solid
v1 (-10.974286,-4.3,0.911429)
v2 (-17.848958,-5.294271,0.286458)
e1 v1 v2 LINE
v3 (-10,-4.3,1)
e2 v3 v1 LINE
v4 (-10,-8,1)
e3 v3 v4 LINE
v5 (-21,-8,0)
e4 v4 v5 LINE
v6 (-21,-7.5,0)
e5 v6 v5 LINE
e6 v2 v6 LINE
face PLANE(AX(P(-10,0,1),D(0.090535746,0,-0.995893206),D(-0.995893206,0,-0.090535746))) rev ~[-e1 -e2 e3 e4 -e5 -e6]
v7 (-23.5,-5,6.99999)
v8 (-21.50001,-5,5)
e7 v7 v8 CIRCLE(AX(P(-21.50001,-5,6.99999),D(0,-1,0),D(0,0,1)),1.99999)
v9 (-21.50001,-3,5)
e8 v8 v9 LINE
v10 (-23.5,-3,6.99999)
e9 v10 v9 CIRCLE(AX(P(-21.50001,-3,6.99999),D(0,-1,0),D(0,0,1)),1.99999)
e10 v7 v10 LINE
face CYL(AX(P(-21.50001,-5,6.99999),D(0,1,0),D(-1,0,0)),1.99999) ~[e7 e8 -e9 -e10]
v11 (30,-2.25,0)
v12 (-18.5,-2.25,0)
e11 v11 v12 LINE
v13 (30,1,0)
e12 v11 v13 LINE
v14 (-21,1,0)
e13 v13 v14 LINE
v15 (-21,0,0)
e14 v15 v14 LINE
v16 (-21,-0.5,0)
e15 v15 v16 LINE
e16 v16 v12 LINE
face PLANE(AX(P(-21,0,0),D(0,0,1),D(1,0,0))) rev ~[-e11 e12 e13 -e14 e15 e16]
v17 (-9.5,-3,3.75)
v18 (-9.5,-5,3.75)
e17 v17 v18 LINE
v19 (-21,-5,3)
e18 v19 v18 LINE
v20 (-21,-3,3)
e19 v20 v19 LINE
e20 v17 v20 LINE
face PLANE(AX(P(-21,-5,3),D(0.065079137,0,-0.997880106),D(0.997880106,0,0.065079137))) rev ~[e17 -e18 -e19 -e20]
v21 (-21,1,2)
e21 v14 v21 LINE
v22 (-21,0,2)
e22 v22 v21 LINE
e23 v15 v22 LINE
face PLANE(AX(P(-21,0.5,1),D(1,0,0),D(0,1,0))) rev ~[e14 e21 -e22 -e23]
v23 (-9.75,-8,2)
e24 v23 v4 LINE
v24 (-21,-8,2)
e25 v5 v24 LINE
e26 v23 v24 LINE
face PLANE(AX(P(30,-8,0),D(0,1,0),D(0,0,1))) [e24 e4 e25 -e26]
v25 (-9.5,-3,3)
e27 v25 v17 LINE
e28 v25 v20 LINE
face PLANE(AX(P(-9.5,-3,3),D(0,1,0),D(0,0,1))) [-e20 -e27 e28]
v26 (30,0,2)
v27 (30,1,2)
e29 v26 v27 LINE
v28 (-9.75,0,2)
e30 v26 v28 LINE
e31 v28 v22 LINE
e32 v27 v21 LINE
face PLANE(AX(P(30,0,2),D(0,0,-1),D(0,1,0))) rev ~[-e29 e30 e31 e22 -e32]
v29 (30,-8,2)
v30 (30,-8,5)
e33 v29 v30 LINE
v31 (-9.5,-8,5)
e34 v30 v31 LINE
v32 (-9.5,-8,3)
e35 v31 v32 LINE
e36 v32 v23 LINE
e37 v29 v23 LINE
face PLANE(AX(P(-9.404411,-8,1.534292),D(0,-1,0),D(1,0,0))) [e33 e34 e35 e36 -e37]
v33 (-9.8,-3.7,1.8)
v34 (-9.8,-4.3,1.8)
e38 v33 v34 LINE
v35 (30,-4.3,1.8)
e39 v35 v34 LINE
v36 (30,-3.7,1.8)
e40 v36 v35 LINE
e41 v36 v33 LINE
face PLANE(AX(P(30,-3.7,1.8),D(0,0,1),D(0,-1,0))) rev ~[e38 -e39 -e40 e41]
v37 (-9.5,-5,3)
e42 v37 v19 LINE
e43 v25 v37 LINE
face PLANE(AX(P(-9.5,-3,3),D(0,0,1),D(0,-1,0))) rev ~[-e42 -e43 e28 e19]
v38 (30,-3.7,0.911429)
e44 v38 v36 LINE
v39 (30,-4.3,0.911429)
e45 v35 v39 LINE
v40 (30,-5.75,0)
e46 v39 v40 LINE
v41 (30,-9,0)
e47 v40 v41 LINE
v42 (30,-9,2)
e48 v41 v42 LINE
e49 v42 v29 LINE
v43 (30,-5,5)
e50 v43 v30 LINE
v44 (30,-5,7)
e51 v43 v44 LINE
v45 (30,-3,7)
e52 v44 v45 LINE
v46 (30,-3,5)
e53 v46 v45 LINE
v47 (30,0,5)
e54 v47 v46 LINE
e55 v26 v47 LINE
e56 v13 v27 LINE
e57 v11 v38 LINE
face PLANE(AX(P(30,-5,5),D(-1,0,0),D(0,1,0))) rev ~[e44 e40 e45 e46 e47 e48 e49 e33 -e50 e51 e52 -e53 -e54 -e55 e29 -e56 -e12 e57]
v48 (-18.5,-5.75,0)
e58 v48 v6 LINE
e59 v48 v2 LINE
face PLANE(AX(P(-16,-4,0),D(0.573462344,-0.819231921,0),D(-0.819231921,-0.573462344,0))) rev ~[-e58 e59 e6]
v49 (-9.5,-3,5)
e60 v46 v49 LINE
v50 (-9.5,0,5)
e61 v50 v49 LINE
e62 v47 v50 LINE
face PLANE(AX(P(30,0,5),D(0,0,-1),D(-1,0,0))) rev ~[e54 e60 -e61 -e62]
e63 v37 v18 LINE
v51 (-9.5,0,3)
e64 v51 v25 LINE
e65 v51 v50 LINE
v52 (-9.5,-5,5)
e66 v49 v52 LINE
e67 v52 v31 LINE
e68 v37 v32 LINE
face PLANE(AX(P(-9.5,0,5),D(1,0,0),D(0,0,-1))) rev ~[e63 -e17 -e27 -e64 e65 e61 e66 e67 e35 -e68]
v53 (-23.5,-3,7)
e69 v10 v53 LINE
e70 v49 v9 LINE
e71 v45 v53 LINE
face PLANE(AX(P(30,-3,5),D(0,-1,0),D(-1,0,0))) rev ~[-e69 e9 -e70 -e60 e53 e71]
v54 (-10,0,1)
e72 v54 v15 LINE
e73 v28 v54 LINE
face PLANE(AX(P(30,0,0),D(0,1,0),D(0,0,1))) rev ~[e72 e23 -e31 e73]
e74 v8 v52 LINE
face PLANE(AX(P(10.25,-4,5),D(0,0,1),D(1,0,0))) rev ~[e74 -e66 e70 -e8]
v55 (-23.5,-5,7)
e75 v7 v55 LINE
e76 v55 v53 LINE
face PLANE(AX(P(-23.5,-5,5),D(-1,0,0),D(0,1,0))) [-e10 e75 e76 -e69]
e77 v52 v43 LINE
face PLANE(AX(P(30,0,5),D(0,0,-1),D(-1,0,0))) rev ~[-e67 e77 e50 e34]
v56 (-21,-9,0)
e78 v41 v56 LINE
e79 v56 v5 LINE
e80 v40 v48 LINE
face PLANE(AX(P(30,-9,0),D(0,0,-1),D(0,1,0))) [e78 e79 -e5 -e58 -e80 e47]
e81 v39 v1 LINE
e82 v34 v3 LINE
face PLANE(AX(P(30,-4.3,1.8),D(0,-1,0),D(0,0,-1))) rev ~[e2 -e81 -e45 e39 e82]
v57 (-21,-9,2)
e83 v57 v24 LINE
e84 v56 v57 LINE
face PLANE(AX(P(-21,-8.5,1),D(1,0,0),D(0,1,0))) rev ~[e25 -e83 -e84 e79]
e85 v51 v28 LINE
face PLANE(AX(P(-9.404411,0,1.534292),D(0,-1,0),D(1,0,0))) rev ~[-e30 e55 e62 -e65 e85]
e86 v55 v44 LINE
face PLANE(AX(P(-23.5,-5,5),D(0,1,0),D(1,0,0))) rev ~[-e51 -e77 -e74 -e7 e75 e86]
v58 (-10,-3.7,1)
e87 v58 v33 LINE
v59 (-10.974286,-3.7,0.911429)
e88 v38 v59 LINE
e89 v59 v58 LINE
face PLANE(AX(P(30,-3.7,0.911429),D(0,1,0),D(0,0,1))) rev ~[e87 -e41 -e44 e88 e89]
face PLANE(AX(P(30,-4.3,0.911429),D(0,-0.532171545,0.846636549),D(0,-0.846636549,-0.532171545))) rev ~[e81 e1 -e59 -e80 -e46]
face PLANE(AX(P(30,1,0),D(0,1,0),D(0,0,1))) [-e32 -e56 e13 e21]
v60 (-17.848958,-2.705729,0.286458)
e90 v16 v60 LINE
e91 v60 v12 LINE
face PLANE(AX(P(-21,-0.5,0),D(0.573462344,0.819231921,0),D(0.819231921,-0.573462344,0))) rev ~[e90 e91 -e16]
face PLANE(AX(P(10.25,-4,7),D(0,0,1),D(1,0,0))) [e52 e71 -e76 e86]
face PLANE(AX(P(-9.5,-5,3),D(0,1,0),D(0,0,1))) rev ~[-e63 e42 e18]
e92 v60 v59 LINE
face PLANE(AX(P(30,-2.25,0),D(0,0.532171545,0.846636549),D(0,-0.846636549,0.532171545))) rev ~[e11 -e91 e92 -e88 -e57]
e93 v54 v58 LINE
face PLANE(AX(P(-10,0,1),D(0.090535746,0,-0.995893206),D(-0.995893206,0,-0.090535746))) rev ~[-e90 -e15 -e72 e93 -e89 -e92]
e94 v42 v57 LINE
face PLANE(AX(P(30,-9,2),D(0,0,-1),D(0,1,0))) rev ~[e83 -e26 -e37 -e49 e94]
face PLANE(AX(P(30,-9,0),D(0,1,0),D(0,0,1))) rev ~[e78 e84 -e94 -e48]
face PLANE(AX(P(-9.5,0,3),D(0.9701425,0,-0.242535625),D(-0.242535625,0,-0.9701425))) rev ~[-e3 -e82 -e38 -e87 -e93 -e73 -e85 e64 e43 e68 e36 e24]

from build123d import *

# Parameters (mm, degrees)
F0_W      = 30
F0_H      = 5
F1_DEPTH  = 8
F4_DEPTH  = 51.001
F5_DEPTH  = 5.001
F6_W      = 1
F6_H      = 2
F7_DEPTH  = 51
F8_W      = 2
F8_H      = 0.75
F9_DEPTH  = 11.5
F11_DEPTH = 6.001
F12_W     = 39.5
F12_H     = 2
F12_W_2   = 14
F13_DEPTH = 2
F14_R     = 1.99999


# Not quite as in the source:
# - a fillet or chamfer is up to 0.001 mm smaller than in the source, because OpenCascade refuses the exact size


with BuildPart() as f1:
    # F0 (on Front) → F1 (new body)
    with BuildSketch(Plane.XZ):
        Polygon((0, 0), (0, 5), (-9.5, 5), (-9.5, 3), (-10, 1), (-21, 0), align=None)
        with Locations((15, 2.5)):
            Rectangle(F0_W, F0_H)
    extrude(amount=F1_DEPTH)

    # F3 (on face) → F4 (cut, through all)
    with BuildSketch(Plane.YZ.offset(30)):
        Polygon((-3.7, 1.8), (-4.3, 1.8), (-4.3, 0.9114285714), (-4, 1.1), (-3.7, 0.9114285714), align=None)
        Polygon((-4.3, 0), (-4.3, 0.9114285714), (-5.75, 0), align=None)
        Polygon((-2.25, 0), (-3.7, 0.9114285714), (-3.7, 0), align=None)
        Polygon((-4, 1.1), (-4.3, 0.9114285714), (-4.3, 0), (-3.7, 0), (-3.7, 0.9114285714), align=None)
    extrude(amount=-F4_DEPTH, mode=Mode.SUBTRACT)

    # F2 (on face) → F5 (cut, through all)
    with BuildSketch(Plane(origin=(0, 0, 0), x_dir=(1, 0, 0), z_dir=(0, 0, -1))):
        Polygon((-16, 4), (-21, 7.5), (-21, 0.5), align=None)
    extrude(amount=-F5_DEPTH, mode=Mode.SUBTRACT)

    # F6 (on face) → F7 (join, through all)
    with BuildSketch(Plane.YZ.offset(30)):
        with Locations((-8.5, 1)):
            Rectangle(F6_W, F6_H)
        with Locations((0.5, 1)):
            Rectangle(F6_W, F6_H)
    extrude(amount=-F7_DEPTH)

    # F8 (on face) → F9 (join)
    with BuildSketch(Plane(origin=(-9.5, 0, 0), x_dir=(0, -1, 0), z_dir=(-1, 0, 0))):
        with Locations((4, 3.375)):
            Rectangle(F8_W, F8_H)
    extrude(amount=F9_DEPTH)

    # F10 (on face) → F11 (cut, through all)
    with BuildSketch(Plane.XZ.offset(5)):
        Polygon((-21, 3.75), (-21, 3), (-9.5, 3.75), align=None)
    extrude(amount=-F11_DEPTH, mode=Mode.SUBTRACT)

    # F12 (on face) → F13 (join)
    with BuildSketch(Plane.XY.offset(5)):
        with Locations((10.25, -4)):
            Rectangle(F12_W, F12_H)
        with Locations((-16.5, -4)):
            Rectangle(F12_W_2, F12_H)
    extrude(amount=F13_DEPTH)

    # F14 (radius 2 in the source; OpenCascade refuses exactly that, so slightly less here)
    f14_edges = [f1.edges().sort_by_distance(p)[0] for p in [
        (-23.5, -4, 5),
    ]]
    fillet(f14_edges, radius=F14_R)


solid = f1.part
